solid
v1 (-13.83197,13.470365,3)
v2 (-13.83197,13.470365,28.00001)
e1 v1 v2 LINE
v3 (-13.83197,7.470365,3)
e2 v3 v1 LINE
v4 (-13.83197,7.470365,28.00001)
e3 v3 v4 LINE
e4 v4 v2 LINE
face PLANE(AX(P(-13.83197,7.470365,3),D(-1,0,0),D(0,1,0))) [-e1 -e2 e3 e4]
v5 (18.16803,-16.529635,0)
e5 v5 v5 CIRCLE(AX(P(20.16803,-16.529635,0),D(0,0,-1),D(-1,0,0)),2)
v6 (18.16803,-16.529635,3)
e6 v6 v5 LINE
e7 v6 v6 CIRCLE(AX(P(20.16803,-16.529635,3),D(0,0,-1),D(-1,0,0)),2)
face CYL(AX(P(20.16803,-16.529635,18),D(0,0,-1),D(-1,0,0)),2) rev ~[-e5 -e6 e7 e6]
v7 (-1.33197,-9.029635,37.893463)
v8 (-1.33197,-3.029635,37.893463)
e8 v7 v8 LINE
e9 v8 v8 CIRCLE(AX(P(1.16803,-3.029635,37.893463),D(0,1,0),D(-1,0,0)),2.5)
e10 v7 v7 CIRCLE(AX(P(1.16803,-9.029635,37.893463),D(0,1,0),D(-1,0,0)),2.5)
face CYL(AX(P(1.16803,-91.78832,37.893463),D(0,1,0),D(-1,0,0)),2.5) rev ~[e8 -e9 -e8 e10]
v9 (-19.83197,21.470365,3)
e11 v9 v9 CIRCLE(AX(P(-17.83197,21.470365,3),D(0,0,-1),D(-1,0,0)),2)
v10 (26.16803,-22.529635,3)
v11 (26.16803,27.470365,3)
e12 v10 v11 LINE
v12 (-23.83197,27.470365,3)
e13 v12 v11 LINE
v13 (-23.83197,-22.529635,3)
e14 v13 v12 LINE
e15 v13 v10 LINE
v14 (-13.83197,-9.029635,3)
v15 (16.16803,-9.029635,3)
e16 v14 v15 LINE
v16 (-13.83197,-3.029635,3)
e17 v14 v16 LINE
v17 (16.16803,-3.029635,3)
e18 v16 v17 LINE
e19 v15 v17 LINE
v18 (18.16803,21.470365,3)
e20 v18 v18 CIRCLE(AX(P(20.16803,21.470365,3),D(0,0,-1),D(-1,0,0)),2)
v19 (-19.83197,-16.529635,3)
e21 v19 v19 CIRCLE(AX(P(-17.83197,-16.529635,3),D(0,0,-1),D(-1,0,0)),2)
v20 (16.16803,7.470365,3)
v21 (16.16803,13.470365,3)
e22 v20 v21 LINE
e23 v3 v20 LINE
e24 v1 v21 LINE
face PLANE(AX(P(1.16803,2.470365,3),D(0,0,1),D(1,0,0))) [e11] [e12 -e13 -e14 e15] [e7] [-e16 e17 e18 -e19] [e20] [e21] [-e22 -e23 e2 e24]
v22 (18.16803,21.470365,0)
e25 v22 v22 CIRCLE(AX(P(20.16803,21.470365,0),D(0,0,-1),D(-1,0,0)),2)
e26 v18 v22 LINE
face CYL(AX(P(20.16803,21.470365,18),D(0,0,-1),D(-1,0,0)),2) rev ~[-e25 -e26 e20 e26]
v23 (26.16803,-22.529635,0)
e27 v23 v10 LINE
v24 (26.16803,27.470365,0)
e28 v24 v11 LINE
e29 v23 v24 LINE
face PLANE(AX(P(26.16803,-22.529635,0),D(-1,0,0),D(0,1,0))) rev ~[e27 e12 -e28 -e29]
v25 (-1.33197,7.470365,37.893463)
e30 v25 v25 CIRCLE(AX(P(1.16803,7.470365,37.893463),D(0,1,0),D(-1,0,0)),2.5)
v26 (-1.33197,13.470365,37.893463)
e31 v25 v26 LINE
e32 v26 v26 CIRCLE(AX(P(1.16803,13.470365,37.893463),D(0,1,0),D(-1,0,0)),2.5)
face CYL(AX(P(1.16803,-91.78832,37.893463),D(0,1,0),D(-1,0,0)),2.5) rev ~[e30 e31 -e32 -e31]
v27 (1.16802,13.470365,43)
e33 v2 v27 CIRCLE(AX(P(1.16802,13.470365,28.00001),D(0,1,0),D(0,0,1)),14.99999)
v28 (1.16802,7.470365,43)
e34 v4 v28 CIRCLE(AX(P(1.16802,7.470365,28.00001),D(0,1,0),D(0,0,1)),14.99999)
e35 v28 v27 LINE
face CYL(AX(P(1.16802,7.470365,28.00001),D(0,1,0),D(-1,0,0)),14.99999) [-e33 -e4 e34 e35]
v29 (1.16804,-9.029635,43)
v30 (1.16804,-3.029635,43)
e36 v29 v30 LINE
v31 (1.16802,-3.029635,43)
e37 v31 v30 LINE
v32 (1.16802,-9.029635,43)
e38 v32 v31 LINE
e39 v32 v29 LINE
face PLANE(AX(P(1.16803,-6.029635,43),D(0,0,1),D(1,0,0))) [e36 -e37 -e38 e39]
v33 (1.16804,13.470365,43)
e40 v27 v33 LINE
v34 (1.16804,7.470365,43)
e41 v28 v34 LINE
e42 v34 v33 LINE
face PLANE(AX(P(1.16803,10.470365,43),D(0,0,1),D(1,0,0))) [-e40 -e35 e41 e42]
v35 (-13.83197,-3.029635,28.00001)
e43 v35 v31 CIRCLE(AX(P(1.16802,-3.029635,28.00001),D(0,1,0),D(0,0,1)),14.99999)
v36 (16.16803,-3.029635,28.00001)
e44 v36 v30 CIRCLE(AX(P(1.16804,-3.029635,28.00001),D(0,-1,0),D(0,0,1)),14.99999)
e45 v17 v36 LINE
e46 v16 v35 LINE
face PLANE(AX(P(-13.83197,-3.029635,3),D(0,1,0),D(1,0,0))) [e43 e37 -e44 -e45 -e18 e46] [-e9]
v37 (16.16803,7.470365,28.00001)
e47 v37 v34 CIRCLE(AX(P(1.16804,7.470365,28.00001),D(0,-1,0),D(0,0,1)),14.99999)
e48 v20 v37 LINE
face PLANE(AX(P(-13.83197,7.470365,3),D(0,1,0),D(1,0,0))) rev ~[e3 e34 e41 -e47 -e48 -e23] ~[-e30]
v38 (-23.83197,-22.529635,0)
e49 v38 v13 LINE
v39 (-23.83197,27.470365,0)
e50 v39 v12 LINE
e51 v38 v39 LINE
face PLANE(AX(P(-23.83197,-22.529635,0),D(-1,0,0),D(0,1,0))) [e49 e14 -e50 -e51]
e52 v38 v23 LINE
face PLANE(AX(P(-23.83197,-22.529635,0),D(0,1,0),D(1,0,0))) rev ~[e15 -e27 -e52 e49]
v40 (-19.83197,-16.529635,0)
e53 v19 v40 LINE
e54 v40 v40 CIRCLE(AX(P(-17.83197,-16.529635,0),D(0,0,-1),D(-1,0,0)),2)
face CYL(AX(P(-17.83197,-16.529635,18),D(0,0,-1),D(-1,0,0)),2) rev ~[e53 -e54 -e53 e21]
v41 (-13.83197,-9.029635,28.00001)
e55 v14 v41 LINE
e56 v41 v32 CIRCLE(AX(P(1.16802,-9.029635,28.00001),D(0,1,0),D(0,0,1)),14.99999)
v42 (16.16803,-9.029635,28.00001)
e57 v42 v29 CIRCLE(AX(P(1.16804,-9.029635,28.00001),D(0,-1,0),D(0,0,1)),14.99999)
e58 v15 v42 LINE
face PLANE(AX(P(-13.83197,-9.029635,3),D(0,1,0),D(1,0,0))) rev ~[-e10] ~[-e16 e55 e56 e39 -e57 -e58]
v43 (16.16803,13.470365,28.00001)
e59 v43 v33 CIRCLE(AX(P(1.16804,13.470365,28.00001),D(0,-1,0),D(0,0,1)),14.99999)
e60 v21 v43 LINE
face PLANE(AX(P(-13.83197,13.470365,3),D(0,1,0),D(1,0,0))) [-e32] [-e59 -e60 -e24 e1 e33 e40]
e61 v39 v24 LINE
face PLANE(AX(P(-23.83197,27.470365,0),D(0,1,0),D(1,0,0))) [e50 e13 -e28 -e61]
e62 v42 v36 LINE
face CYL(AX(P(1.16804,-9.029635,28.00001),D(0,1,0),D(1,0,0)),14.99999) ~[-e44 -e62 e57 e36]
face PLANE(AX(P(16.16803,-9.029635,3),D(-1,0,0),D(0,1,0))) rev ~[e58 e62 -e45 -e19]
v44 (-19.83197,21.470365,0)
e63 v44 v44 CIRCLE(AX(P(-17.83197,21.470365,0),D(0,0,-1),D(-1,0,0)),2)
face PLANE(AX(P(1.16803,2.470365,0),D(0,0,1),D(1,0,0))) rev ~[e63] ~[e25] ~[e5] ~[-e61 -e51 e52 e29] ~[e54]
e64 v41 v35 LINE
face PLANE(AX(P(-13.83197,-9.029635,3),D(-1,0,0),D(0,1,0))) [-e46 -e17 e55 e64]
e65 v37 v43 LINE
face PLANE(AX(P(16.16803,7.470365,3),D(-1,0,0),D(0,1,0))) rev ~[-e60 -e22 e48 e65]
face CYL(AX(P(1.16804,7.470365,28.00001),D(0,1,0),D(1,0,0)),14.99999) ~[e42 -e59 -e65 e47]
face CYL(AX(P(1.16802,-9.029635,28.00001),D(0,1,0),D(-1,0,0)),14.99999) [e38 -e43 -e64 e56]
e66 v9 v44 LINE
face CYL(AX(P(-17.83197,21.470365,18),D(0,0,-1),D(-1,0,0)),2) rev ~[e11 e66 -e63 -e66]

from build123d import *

# Parameters (mm, degrees)
F0_W      = 50
F0_H      = 50
F1_DEPTH  = 3
F2_W      = 30
F2_H      = 6
F3_DEPTH  = 40
F4_W      = 30
F4_H      = 6
F5_DEPTH  = 40
F6_R      = 14.99999
F7_R      = 14.99999
F9_D      = 5
F12_D     = 4
F12_DEPTH = 15
F12_TIP   = 1.2017212381


# Not quite as in the source:
# - a fillet or chamfer is up to 0.001 mm smaller than in the source, because OpenCascade refuses the exact size


with BuildPart() as f1:
    # F0 (on Top) → F1 (new body)
    with BuildSketch(Plane.XY):
        with Locations((1.1680303141, 2.4703653681)):
            Rectangle(F0_W, F0_H)
    extrude(amount=F1_DEPTH)

    # F2 (on face) → F3 (join)
    with BuildSketch(Plane.XY.offset(3)):
        with Locations((1.1680303141, -6.0296346319)):
            Rectangle(F2_W, F2_H)
    extrude(amount=F3_DEPTH)

    # F4 (on face) → F5 (join)
    with BuildSketch(Plane.XY.offset(3)):
        with Locations((1.1680303141, 10.4703653681)):
            Rectangle(F4_W, F4_H)
    extrude(amount=F5_DEPTH)

    # F6 (radius 15 in the source; OpenCascade refuses exactly that, so slightly less here)
    f6_edges = [f1.edges().sort_by_distance(p)[0] for p in [
        (-13.83197, -6.029635, 43),
        (16.16803, -6.029635, 43),
    ]]
    fillet(f6_edges, radius=F6_R)

    # F7 (radius 15 in the source; OpenCascade refuses exactly that, so slightly less here)
    f7_edges = [f1.edges().sort_by_distance(p)[0] for p in [
        (16.16803, 10.470365, 43),
        (-13.83197, 10.470365, 43),
    ]]
    fillet(f7_edges, radius=F7_R)

    # F9 (through all)
    with Locations(Plane.XZ.offset(9.0296346319)):
        with Locations((1.1680303141, 37.8934629261)):
            Hole(F9_D / 2)

    # F12
    with Locations(Plane.XY.offset(3)):
        with Locations((-17.8319696859, 21.4703653681), (20.1680303141, 21.4703653681), (20.1680303141, -16.5296346319), (-17.8319696859, -16.5296346319)):
            Hole(F12_D / 2, depth=F12_DEPTH)
            with Locations((0, 0, -(F12_DEPTH + F12_TIP / 2))):  # 118° drill point
                Cone(0, F12_D / 2, F12_TIP, mode=Mode.SUBTRACT)


solid = f1.part
